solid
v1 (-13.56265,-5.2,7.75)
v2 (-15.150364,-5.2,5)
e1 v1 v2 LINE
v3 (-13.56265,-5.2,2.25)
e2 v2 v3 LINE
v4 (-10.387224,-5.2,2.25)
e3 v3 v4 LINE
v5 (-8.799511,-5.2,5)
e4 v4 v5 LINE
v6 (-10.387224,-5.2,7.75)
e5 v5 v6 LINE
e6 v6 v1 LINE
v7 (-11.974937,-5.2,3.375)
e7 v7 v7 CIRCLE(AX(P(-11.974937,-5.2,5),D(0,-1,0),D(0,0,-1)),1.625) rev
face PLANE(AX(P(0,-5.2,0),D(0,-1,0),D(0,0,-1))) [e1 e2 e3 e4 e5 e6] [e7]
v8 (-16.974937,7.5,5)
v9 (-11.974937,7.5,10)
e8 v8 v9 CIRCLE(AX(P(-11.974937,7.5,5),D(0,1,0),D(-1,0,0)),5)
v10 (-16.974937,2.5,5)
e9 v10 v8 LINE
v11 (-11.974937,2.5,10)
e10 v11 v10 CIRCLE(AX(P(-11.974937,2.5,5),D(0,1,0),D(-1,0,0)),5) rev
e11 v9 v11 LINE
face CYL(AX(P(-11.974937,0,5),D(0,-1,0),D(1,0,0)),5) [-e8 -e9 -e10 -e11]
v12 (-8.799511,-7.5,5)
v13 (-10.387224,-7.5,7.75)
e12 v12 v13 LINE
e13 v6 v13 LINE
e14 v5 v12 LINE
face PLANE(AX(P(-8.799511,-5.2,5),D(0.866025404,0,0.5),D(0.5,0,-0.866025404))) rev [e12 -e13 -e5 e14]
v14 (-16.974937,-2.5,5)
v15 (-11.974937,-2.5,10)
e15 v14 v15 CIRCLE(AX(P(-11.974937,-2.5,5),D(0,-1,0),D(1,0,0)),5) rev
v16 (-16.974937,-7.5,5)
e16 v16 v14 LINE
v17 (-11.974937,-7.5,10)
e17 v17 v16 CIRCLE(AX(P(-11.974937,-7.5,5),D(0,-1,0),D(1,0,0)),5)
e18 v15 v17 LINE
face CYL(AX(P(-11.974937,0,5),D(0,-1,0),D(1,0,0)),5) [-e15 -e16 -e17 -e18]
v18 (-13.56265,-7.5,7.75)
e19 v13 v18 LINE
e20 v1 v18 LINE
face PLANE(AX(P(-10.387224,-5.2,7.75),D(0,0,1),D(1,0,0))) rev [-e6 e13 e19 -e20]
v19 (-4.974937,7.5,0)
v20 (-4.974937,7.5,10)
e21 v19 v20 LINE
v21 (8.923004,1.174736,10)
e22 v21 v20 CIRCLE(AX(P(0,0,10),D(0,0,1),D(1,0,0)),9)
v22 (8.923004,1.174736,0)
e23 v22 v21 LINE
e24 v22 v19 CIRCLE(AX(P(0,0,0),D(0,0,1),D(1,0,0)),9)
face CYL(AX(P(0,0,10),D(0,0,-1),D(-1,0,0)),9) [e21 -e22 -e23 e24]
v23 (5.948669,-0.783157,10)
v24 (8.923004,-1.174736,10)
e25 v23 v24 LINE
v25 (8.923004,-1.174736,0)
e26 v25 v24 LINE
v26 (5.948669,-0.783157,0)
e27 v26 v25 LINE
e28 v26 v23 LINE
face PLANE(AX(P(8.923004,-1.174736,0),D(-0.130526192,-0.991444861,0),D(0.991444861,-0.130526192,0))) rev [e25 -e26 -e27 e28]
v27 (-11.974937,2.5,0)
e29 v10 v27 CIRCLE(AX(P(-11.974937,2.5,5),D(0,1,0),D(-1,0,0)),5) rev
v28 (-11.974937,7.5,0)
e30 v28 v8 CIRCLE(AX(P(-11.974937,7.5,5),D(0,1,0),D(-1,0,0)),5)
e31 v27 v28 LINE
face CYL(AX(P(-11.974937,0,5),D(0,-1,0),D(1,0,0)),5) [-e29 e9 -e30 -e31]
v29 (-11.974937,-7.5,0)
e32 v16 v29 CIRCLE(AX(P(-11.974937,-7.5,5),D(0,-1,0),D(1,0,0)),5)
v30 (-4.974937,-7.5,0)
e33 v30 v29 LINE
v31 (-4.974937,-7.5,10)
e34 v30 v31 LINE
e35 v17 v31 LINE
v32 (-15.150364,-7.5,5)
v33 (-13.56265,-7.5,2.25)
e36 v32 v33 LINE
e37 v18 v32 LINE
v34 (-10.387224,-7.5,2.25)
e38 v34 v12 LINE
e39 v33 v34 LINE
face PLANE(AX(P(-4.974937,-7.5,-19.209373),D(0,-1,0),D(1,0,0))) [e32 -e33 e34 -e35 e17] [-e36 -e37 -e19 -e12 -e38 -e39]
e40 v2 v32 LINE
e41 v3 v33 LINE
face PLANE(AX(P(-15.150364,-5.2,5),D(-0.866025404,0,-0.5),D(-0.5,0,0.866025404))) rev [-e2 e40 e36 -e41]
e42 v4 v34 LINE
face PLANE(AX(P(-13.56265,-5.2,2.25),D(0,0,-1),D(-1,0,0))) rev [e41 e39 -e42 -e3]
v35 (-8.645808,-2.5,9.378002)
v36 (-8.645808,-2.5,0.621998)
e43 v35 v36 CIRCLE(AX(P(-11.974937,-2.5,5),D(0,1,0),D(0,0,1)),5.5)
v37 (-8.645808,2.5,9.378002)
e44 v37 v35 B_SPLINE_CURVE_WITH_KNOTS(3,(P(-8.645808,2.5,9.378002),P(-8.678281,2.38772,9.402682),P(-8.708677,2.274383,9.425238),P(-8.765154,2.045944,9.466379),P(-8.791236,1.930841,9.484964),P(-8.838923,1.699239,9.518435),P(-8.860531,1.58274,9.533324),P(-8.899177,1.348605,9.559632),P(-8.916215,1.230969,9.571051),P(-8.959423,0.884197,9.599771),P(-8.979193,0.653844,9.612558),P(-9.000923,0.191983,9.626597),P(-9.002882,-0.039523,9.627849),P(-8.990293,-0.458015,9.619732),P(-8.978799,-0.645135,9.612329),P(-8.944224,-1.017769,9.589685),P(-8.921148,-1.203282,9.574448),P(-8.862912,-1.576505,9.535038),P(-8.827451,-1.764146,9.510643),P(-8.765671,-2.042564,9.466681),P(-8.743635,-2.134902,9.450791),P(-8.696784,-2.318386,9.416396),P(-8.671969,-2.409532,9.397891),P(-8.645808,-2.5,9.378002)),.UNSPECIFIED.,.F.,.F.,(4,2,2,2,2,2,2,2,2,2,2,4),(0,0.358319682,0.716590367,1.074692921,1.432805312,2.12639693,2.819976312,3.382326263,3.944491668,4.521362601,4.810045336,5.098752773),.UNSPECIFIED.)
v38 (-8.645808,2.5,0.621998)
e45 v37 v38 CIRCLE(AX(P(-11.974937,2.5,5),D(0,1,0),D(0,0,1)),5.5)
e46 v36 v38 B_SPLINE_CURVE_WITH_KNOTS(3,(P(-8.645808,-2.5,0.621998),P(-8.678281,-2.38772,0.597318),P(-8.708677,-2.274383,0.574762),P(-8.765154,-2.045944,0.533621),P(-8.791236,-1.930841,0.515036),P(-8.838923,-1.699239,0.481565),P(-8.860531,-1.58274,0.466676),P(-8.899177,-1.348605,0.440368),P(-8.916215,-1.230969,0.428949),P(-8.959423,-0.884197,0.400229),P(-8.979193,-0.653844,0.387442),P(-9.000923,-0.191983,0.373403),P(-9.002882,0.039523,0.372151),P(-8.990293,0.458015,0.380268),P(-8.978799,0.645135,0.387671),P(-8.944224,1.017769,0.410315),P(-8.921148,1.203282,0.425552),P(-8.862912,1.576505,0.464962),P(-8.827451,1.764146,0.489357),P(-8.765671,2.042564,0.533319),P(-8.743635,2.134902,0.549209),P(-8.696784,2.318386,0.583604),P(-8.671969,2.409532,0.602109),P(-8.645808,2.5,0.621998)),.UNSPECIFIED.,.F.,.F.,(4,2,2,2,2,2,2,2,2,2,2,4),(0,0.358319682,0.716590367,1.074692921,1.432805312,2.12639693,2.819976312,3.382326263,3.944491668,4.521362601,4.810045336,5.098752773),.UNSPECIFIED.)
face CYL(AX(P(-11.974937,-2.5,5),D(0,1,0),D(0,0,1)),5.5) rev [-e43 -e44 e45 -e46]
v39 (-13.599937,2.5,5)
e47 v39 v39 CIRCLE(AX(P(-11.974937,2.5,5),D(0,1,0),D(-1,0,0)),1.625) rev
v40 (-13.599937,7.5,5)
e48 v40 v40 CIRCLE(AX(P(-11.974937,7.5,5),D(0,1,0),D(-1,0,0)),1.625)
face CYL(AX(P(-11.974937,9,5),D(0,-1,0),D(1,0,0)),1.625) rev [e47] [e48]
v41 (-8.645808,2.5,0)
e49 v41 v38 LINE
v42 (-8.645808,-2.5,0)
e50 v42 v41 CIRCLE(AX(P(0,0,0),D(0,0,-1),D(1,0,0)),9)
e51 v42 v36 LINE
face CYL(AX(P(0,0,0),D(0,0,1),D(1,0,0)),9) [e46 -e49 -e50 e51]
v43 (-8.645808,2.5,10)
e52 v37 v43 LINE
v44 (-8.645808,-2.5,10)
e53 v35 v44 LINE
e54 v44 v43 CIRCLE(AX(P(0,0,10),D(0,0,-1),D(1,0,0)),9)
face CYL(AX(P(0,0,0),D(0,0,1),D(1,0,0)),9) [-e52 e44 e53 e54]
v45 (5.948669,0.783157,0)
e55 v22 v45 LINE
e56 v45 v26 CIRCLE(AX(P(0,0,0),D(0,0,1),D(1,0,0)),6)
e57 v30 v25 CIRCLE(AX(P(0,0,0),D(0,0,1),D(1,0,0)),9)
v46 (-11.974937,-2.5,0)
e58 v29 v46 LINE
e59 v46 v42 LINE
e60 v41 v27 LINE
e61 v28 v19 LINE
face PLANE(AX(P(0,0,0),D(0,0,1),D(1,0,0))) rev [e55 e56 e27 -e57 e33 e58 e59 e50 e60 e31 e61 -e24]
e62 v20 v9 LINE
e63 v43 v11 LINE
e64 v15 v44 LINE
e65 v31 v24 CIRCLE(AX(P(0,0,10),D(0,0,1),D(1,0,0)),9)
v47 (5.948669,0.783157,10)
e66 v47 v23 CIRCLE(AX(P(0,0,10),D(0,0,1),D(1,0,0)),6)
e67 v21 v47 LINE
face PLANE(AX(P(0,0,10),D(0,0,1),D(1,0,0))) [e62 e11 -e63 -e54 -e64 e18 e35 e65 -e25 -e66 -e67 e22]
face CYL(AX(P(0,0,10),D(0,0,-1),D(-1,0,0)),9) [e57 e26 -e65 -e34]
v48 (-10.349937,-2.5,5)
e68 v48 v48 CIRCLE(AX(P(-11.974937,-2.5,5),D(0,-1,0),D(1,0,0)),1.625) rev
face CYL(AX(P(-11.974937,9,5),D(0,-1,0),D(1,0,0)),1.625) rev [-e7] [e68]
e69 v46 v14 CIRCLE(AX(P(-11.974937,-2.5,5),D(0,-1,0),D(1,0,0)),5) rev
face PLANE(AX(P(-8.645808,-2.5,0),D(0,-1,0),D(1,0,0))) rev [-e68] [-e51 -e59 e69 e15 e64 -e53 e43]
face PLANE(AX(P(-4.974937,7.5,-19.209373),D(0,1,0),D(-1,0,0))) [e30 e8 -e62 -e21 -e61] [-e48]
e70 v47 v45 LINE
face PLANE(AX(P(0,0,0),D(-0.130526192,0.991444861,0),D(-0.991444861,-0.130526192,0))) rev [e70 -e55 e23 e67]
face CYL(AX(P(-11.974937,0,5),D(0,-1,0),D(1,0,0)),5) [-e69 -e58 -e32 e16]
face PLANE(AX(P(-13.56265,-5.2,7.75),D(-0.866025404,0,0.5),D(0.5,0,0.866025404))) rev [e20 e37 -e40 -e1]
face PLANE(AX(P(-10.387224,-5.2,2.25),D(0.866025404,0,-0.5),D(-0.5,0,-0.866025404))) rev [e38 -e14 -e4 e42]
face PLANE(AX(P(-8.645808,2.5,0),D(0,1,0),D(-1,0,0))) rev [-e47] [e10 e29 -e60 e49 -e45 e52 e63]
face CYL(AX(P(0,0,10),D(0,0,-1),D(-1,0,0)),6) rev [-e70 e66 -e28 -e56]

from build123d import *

# Parameters (mm, degrees)
CROQUIS1_R              = 9
CROQUIS1_R_2            = 6
SALIENTE_EXTRUIR1_DEPTH = 10
CORTAR_EXTRUIR1_DEPTH   = 17.186414056
SALIENTE_EXTRUIR2_START = -10
SALIENTE_EXTRUIR2_DEPTH = 10
REDONDEO1_R             = 5
CROQUIS4_R              = 1.625
CORTAR_EXTRUIR2_DEPTH   = 26.698219636
CORTAR_EXTRUIR4_DEPTH   = 22.659835929
CROQUIS6_R              = 5.5
CORTAR_EXTRUIR5_DEPTH   = 2.5
CORTAR_EXTRUIR6_DEPTH   = 2.3


with BuildPart() as part:
    # Croquis1 → Saliente-Extruir1 (new body)
    with BuildSketch(Plane.XY):
        Circle(CROQUIS1_R)
        Circle(CROQUIS1_R_2, mode=Mode.SUBTRACT)
    extrude(amount=SALIENTE_EXTRUIR1_DEPTH)

    # Croquis2 → Cortar-Extruir1 (cut, through all)
    with BuildSketch(Plane.XY.offset(10)):
        with BuildLine():
            Line((0, 0), (8.923003752, 1.17473573))
            ThreePointArc((8.923003752, 1.17473573), (9, 0), (8.923003752, -1.17473573))
            Line((8.923003752, -1.17473573), (0, 0))
        make_face()
    extrude(amount=-CORTAR_EXTRUIR1_DEPTH, mode=Mode.SUBTRACT)

    # Croquis3 → Saliente-Extruir2 (add)
    with BuildSketch(Plane.XY.offset(10).offset(SALIENTE_EXTRUIR2_START)):
        with BuildLine():
            Line((-4.974937186, 7.5), (-16.974937186, 7.5))
            Line((-16.974937186, 7.5), (-16.974937186, -7.5))
            Line((-16.974937186, -7.5), (-4.974937186, -7.5))
            ThreePointArc((-4.974937186, -7.5), (-9, 0), (-4.974937186, 7.5))
        make_face()
    extrude(amount=SALIENTE_EXTRUIR2_DEPTH)

    # Redondeo1
    redondeo1_edges = [part.edges().sort_by_distance(p)[0] for p in [
        (-16.974937186, 0, 0),
        (-16.974937186, 0, 10),
    ]]
    fillet(redondeo1_edges, radius=REDONDEO1_R - 0.0001)  # a hair under: the kernel refuses the full size

    # Croquis4 → Cortar-Extruir2 (cut, through all)
    with BuildSketch(Plane.XZ.offset(7.5)):
        with Locations((-11.974937186, 5)):
            Circle(CROQUIS4_R)
    extrude(amount=-CORTAR_EXTRUIR2_DEPTH, mode=Mode.SUBTRACT)

    # Croquis5 → Cortar-Extruir4 (cut, through all)
    with BuildSketch(Plane.XY.offset(10)):
        with BuildLine():
            Line((-8.645808233, 2.5), (-21.808614769, 2.5))
            Line((-21.808614769, 2.5), (-21.808614769, -2.5))
            Line((-21.808614769, -2.5), (-8.645808233, -2.5))
            ThreePointArc((-8.645808233, -2.5), (-9, 0), (-8.645808233, 2.5))
        make_face()
    extrude(amount=-CORTAR_EXTRUIR4_DEPTH, mode=Mode.SUBTRACT)

    # Croquis6 → Cortar-Extruir5 (cut, symmetric)
    with BuildSketch(Plane(origin=(0, 0, 0), x_dir=(1, 0, 0), z_dir=(0, 1, 0))):
        with Locations((-11.974937186, -5)):
            Circle(CROQUIS6_R)
    extrude(amount=CORTAR_EXTRUIR5_DEPTH, both=True, mode=Mode.SUBTRACT)

    # Croquis7 → Cortar-Extruir6 (cut)
    with BuildSketch(Plane.XZ.offset(7.5)):
        Polygon((-8.799510705, 5), (-10.387223945, 7.75), (-13.562650426, 7.75), (-15.150363666, 5), (-13.562650426, 2.25), (-10.387223945, 2.25), align=None)
    extrude(amount=-CORTAR_EXTRUIR6_DEPTH, mode=Mode.SUBTRACT)


solid = part.part
